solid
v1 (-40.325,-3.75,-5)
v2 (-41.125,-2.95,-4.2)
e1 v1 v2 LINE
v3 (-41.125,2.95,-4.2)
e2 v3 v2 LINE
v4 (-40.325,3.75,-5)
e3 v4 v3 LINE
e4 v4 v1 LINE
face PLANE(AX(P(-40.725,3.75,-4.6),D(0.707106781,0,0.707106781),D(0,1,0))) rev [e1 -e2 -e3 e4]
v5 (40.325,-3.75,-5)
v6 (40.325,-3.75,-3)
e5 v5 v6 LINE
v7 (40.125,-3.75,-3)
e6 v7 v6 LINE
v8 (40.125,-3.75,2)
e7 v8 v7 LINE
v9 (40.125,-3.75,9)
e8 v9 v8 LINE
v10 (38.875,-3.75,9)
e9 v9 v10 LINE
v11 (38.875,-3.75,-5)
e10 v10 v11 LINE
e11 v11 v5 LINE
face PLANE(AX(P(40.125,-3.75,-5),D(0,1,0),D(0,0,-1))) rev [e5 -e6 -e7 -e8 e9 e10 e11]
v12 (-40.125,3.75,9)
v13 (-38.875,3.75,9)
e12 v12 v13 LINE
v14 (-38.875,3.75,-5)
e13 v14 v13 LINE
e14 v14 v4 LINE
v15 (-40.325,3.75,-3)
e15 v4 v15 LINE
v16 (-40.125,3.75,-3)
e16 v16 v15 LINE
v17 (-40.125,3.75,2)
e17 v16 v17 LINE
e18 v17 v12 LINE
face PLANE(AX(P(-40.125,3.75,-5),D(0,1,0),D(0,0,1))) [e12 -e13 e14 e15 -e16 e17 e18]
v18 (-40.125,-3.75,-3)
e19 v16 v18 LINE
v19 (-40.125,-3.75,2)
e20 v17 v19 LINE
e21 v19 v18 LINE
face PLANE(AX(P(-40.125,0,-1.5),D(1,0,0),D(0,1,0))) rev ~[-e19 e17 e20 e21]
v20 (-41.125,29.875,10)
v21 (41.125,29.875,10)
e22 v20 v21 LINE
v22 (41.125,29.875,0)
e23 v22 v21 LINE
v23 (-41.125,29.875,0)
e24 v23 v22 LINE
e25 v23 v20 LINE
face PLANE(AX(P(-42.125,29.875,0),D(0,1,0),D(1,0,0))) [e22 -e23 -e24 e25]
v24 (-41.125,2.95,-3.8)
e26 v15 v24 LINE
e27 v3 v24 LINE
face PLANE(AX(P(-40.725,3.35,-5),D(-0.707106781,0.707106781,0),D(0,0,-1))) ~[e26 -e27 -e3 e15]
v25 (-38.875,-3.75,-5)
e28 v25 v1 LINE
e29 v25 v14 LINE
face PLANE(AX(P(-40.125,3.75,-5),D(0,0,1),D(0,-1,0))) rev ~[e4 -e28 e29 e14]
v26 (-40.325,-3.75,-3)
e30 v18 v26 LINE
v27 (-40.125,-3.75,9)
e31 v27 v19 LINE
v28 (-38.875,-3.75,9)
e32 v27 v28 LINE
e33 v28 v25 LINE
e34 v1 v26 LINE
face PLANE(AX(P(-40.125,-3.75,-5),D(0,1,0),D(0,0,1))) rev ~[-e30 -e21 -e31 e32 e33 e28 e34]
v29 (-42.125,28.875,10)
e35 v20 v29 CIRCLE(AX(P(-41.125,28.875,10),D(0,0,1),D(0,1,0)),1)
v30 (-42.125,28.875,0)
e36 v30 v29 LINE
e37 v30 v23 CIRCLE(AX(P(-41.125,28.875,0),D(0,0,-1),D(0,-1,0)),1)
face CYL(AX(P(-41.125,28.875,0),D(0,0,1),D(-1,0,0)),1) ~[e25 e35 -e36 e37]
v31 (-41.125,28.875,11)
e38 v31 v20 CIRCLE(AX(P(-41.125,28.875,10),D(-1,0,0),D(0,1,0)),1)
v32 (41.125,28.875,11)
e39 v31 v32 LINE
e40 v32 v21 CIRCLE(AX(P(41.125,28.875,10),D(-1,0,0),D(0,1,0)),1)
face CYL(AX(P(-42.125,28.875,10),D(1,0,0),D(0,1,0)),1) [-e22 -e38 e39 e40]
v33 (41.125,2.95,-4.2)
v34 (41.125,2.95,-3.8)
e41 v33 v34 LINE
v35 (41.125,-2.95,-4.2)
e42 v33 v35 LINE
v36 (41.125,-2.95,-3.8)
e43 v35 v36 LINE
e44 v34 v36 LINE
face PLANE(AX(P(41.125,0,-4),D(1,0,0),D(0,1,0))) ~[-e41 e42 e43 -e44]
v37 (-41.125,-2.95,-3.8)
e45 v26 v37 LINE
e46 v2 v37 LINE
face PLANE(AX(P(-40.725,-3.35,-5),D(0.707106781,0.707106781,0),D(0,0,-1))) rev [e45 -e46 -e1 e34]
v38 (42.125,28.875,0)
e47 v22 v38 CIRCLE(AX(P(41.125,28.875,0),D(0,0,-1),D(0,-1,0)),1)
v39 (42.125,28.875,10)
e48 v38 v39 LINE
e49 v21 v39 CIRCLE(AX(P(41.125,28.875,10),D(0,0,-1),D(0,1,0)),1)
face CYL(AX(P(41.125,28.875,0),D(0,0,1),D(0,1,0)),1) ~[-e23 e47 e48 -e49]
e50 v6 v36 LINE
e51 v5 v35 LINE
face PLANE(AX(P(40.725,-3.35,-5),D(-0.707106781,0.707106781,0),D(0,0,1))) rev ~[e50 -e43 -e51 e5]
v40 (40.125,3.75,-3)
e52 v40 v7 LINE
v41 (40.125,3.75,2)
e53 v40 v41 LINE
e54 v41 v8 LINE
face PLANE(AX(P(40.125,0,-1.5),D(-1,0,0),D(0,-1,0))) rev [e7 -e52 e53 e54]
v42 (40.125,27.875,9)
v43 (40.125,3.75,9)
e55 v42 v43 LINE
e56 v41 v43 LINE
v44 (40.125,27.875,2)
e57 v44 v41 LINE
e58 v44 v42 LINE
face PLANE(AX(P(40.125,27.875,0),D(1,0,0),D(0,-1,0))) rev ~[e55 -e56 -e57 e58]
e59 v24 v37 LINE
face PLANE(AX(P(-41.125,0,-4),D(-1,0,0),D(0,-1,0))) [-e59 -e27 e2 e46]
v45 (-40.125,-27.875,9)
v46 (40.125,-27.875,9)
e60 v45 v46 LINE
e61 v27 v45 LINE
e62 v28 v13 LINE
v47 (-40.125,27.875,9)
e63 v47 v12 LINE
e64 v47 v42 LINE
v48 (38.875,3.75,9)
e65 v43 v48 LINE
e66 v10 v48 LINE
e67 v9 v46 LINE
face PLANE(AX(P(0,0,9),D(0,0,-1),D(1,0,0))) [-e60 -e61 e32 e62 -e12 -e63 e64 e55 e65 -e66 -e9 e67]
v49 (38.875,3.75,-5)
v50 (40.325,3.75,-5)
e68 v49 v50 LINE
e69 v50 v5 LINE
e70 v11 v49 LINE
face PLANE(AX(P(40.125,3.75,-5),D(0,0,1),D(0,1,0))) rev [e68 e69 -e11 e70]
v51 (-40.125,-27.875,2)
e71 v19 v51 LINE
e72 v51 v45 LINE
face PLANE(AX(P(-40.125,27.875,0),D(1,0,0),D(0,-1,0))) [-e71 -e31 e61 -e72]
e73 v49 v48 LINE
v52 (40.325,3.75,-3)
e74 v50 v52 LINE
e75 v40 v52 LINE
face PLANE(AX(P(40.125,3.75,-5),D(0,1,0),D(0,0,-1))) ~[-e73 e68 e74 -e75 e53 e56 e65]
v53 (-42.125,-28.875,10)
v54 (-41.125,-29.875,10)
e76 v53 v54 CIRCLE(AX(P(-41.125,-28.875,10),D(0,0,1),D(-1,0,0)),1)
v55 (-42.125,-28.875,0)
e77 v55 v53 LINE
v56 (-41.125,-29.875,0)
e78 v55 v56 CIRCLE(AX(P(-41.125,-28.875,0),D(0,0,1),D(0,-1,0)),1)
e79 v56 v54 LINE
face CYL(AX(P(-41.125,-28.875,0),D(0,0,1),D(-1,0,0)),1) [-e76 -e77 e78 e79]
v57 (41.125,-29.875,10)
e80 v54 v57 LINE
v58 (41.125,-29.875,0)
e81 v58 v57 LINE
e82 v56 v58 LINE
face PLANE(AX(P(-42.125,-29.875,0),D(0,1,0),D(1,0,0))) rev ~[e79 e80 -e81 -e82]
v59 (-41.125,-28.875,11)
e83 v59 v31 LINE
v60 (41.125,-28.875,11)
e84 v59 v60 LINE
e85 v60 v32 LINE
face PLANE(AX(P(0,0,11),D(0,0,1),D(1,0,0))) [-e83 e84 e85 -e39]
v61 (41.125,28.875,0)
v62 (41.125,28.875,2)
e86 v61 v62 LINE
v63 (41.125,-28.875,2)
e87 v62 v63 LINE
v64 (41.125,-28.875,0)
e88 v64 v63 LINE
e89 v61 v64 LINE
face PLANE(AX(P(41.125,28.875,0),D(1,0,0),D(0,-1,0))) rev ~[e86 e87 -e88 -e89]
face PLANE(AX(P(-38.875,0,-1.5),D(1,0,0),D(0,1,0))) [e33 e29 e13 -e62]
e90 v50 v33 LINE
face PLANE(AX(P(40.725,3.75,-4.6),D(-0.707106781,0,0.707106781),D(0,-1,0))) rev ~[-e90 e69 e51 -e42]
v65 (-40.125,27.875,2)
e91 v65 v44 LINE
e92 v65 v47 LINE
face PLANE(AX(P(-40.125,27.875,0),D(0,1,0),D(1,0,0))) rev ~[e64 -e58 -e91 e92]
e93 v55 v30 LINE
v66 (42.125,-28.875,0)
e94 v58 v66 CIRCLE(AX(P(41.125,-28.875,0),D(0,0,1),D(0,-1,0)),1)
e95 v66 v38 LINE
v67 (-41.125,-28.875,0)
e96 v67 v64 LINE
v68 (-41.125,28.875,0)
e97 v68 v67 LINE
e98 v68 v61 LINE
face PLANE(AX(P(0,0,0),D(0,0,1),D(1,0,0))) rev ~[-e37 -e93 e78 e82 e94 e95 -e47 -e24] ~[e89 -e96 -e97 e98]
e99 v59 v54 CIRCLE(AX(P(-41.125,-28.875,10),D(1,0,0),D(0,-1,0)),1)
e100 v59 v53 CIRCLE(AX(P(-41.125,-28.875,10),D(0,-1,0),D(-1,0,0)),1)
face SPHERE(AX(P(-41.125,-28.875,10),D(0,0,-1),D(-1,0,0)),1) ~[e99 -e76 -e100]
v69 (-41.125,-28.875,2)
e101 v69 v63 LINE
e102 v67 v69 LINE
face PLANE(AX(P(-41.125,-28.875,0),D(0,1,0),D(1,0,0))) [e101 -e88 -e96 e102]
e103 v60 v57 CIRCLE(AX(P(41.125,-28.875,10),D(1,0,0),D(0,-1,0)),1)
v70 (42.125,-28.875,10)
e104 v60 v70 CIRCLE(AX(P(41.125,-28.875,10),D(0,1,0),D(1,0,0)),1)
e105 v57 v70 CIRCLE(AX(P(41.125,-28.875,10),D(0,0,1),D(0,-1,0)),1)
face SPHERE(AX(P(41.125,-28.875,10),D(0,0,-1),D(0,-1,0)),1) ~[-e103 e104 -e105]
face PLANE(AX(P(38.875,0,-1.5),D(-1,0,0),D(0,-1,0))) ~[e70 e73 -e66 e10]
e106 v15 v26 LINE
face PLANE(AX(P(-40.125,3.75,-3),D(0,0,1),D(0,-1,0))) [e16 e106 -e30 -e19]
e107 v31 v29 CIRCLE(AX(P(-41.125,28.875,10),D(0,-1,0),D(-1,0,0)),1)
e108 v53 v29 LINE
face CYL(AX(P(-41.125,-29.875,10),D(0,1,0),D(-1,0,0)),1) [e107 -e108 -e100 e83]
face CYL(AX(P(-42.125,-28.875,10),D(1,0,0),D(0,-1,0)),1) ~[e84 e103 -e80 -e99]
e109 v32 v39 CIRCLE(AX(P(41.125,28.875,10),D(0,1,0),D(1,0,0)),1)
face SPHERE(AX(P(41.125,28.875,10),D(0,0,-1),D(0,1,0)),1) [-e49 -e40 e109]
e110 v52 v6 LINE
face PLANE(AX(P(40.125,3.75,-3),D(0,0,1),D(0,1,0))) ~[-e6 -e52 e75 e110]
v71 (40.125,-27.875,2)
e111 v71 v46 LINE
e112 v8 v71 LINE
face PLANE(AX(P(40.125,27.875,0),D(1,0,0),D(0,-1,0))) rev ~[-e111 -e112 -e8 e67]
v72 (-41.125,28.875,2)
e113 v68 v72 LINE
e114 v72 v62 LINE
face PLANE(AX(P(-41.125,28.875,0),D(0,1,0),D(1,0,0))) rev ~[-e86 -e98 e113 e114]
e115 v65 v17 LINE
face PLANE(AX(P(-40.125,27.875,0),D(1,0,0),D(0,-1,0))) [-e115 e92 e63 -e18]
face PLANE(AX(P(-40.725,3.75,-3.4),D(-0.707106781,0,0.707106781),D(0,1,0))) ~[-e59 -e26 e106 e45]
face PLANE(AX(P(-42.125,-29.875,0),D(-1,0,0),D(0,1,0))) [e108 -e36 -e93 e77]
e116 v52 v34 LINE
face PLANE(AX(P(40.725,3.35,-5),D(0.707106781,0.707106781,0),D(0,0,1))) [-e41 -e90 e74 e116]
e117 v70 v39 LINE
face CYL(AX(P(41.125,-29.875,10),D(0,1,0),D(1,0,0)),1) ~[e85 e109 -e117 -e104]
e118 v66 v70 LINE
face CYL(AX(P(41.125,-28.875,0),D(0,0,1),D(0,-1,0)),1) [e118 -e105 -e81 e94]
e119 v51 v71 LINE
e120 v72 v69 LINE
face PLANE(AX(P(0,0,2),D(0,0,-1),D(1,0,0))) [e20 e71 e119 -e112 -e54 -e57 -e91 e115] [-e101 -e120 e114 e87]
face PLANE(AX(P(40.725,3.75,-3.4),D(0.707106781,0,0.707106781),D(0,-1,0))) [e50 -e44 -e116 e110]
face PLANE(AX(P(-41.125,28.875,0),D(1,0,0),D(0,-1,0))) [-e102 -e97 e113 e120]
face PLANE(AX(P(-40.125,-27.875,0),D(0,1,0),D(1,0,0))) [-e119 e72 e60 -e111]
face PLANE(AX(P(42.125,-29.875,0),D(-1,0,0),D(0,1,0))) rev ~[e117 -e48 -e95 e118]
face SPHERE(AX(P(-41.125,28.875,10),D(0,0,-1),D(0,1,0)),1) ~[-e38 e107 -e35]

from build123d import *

# Parameters (mm, degrees)
F0_W      = 84.25
F0_H      = 59.75
F1_DEPTH  = 11
F2_W      = 80.25
F2_H      = 55.75
F3_DEPTH  = 9
F4_W      = 82.25
F4_H      = 57.75
F4_W_2    = 80.25
F4_H_2    = 55.75
F5_DEPTH  = 2
F6_W      = 7.5
F6_H      = 7
F7_DEPTH  = 1.25
F8_R      = 1
F9_W      = 7.5
F9_H      = 2
F10_DEPTH = 1
F11_SIZE  = 0.8


with BuildPart() as f1:
    # F0 (on Top) → F1 (new body)
    with BuildSketch(Plane.XY):
        Rectangle(F0_W, F0_H)
    extrude(amount=F1_DEPTH)

    # F2 (on face) → F3 (cut)
    with BuildSketch(Plane(origin=(0, 0, 0), x_dir=(1, 0, 0), z_dir=(0, 0, -1))):
        Rectangle(F2_W, F2_H)
    extrude(amount=-F3_DEPTH, mode=Mode.SUBTRACT)

    # F4 (on face) → F5 (cut)
    with BuildSketch(Plane(origin=(0, 0, 0), x_dir=(1, 0, 0), z_dir=(0, 0, -1))):
        Rectangle(F4_W, F4_H)
        Rectangle(F4_W_2, F4_H_2, mode=Mode.SUBTRACT)
    extrude(amount=-F5_DEPTH, mode=Mode.SUBTRACT)

    # F6 (on face) → F7 (join)
    with BuildSketch(Plane.YZ.offset(-40.125)):
        with Locations((0, -1.5)):
            Rectangle(F6_W, F6_H)
        with Locations((0, 5.5)):
            Rectangle(F6_W, F6_H)
    extrude(amount=F7_DEPTH)

    # F8
    f8_edges = [f1.edges().sort_by_distance(p)[0] for p in [
        (-42.125, -29.875, 5.5),
        (42.125, -29.875, 5.5),
        (-42.125, 29.875, 5.5),
        (42.125, 29.875, 5.5),
        (0, 29.875, 11),
        (-42.125, 0, 11),
        (0, -29.875, 11),
        (42.125, 0, 11),
    ]]
    fillet(f8_edges, radius=F8_R)

    # F9 (on face) → F10 (join)
    with BuildSketch(Plane(origin=(-40.125, 0, 0), x_dir=(0, -1, 0), z_dir=(-1, 0, 0))):
        with Locations((0, -4)):
            Rectangle(F9_W, F9_H)
    extrude(amount=F10_DEPTH)

    # F11
    f11_edges = [f1.edges().sort_by_distance(p)[0] for p in [
        (-41.125, 0, -3),
        (-41.125, 3.75, -4),
        (-41.125, 0, -5),
        (-41.125, -3.75, -4),
    ]]
    chamfer(f11_edges, length=F11_SIZE)

    # F12: F1 across plane


with BuildPart() as f1_1:
    add(f1.part)
    add(f1.part.mirror(Plane.YZ))


solid = f1_1.part
